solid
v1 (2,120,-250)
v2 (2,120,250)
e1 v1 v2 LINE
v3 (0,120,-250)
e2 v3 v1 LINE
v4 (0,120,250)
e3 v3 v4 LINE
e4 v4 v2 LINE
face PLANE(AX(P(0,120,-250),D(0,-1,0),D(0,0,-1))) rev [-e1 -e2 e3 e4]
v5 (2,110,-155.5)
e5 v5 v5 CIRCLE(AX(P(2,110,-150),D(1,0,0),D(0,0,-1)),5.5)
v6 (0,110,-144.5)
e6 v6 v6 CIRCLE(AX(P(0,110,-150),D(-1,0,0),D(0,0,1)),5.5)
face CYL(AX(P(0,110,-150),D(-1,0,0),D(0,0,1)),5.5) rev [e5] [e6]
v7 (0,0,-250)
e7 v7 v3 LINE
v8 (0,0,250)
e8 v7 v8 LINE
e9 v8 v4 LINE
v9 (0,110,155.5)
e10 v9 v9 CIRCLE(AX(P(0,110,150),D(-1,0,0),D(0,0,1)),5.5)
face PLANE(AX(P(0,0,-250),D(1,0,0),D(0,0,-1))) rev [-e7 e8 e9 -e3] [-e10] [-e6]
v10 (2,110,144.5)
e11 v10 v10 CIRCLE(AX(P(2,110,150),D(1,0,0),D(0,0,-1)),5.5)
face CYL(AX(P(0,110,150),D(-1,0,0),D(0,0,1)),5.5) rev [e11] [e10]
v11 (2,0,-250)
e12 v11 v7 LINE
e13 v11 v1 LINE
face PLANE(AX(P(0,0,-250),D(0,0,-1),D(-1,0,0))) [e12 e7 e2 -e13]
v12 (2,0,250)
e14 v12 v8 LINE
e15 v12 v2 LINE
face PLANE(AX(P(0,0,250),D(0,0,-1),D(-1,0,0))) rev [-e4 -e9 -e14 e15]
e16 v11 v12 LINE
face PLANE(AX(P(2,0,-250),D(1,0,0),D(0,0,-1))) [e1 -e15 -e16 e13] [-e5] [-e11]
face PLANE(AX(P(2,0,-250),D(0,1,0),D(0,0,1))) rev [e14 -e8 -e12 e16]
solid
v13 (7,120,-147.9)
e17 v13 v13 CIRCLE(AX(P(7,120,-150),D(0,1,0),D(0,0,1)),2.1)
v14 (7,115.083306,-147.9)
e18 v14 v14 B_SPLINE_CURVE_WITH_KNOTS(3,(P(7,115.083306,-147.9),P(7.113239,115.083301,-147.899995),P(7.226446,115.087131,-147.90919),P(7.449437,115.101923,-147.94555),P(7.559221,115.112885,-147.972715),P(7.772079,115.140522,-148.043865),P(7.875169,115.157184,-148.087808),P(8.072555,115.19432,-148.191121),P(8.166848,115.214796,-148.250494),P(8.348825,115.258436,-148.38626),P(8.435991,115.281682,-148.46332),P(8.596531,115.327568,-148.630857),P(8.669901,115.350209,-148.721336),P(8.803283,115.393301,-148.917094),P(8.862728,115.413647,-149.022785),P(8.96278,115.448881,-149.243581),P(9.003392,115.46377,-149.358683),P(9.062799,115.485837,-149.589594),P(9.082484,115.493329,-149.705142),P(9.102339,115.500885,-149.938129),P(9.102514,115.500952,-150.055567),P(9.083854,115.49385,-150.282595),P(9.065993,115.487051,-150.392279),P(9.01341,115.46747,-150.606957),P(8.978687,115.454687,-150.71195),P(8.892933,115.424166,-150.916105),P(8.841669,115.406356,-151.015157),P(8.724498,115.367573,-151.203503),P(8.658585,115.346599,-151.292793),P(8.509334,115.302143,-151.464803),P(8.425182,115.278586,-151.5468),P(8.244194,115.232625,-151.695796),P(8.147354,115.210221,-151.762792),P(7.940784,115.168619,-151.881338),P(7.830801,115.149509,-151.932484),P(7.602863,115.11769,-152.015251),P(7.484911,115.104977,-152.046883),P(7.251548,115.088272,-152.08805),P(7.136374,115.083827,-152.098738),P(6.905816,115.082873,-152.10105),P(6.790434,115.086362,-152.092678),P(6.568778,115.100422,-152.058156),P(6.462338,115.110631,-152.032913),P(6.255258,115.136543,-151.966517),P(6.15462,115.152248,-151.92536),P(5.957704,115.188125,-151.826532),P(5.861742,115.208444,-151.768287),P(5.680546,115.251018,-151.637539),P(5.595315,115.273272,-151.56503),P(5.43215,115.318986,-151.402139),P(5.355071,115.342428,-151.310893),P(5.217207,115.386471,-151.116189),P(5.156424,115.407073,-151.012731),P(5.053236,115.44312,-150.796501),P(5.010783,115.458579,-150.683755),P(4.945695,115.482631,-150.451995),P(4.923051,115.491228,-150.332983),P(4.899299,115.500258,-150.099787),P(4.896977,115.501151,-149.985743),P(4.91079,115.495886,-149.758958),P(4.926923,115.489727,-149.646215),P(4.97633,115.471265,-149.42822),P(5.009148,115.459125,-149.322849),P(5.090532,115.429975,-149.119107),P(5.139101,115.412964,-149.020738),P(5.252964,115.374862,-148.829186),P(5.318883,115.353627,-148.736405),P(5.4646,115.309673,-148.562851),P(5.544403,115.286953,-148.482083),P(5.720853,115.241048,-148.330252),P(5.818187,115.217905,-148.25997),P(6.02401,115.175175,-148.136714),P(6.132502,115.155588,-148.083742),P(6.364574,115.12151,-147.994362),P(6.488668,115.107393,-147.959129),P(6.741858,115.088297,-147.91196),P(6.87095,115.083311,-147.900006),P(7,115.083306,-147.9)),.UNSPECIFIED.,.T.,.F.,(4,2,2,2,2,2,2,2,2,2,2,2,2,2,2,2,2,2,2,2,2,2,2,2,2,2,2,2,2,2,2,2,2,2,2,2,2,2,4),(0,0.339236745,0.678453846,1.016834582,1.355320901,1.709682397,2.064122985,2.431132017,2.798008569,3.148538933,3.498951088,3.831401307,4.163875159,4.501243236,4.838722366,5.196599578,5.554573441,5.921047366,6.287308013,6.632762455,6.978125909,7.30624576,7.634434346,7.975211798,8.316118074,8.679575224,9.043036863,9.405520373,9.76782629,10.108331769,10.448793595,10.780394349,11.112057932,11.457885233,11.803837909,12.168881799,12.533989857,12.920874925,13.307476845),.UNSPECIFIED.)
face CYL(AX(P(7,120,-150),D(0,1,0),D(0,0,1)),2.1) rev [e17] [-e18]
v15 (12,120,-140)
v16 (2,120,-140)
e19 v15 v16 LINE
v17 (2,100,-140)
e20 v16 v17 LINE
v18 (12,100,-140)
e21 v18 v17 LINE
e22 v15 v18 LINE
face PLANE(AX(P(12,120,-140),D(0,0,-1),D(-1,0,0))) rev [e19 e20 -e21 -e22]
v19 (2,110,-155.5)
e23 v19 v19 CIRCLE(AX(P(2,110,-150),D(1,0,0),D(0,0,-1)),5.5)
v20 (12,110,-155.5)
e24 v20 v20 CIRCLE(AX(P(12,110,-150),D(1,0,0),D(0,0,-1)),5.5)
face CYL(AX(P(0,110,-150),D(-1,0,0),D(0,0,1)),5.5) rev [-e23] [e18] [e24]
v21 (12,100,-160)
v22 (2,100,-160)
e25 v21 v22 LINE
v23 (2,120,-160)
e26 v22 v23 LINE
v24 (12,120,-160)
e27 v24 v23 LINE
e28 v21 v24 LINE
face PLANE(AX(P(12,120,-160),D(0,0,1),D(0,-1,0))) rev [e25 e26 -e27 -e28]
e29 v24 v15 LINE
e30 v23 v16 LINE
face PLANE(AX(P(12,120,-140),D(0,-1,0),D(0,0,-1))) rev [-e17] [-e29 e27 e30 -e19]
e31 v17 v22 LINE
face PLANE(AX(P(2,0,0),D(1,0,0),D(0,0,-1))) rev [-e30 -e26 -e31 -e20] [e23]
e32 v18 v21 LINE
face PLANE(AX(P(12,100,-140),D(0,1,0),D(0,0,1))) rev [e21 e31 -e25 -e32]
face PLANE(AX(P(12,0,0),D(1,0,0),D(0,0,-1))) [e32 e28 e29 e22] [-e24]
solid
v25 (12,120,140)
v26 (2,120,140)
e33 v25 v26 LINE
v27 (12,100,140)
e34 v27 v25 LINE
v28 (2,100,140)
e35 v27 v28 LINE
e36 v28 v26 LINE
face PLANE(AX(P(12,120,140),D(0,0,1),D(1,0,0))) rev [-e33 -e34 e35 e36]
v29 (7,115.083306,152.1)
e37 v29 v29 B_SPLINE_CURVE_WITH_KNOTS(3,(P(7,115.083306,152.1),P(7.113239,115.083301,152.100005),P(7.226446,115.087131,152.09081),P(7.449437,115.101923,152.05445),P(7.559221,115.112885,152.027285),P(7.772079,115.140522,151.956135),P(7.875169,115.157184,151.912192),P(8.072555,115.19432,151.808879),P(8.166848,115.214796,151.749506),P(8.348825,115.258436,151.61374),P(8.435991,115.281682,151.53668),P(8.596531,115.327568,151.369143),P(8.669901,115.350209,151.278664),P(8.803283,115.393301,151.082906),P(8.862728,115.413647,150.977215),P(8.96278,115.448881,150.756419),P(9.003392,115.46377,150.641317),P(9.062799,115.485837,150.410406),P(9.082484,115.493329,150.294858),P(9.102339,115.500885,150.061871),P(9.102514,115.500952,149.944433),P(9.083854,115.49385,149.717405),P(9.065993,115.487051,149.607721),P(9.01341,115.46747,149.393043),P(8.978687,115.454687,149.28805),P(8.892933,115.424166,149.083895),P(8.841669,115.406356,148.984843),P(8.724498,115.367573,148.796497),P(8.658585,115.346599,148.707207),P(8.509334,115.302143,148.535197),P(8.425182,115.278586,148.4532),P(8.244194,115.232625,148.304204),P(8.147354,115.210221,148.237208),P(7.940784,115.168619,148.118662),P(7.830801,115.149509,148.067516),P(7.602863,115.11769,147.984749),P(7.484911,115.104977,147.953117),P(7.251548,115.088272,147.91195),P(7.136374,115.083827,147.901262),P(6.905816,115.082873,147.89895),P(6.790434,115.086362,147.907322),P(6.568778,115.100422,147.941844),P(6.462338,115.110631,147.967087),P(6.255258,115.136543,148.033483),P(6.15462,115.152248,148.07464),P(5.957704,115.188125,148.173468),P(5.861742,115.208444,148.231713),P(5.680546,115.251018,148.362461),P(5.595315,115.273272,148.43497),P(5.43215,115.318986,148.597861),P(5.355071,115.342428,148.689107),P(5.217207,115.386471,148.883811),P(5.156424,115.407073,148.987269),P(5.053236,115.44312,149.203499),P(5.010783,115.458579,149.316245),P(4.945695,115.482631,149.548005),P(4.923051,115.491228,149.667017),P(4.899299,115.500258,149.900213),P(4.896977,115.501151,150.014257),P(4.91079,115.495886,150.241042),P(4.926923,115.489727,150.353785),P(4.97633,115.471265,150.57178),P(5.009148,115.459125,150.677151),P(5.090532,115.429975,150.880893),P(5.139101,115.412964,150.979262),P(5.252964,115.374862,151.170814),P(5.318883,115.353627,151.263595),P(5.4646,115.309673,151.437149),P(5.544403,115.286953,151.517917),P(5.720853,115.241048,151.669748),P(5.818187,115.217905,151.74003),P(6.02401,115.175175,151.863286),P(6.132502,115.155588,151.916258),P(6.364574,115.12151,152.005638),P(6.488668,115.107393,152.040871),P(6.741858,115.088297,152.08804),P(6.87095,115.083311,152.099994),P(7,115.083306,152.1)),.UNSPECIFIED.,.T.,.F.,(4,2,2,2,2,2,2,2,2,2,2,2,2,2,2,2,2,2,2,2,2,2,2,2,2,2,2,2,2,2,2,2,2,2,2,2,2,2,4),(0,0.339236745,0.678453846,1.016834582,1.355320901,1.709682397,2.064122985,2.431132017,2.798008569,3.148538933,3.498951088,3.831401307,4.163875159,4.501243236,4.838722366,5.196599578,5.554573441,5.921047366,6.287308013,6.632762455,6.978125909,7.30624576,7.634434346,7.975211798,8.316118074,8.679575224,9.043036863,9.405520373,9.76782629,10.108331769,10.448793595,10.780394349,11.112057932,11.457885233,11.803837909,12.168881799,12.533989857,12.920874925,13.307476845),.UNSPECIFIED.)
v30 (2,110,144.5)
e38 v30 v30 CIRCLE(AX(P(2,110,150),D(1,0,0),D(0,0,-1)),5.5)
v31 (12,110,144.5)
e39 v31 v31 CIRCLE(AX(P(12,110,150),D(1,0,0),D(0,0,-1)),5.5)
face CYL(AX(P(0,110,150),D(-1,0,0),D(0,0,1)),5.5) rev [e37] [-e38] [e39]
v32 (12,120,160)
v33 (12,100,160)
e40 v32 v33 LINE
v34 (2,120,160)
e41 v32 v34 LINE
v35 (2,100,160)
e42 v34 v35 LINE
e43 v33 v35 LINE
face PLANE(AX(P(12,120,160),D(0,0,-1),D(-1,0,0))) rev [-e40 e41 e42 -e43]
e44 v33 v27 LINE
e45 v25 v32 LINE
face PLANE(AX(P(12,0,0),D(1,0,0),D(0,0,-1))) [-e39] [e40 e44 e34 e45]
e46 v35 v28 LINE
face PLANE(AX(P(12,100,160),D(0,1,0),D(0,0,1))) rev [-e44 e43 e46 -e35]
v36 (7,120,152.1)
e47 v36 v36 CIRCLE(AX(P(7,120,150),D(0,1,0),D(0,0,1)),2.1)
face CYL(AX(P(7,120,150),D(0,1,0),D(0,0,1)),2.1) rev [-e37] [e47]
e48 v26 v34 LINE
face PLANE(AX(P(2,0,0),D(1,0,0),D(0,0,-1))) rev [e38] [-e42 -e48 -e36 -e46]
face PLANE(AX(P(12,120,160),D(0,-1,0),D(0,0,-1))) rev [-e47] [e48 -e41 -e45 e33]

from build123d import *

# Parameters (mm, degrees)
SKIZZE1_W                                 = 2
SKIZZE1_H                                 = 120
BASIS_BLECH1_DEPTH                        = 250
SKIZZE6_W                                 = 20
SKIZZE6_H                                 = 20
AUFSATZ_LINEAR_AUSTRAGEN1_DEPTH           = 10
AUFSATZ_LINEAR_AUSTRAGEN1_2_DEPTH         = 10
F_11_0_11_DURCHMESSER_BOHRUNG1_AT_2_COUNT = 2
F_11_0_11_DURCHMESSER_BOHRUNG1_AT_2_PITCH = 300
M5_GEWINDEBOHRUNG1_AT_2_COUNT             = 2
M5_GEWINDEBOHRUNG1_AT_2_PITCH             = 300


# Sheet-metal steps are written as plain solids
with BuildPart() as part:
    # Skizze1 → Basis-Blech1 (new, symmetric)
    with BuildSketch(Plane.XY):
        with Locations((1, 60)):
            Rectangle(SKIZZE1_W, SKIZZE1_H)
    extrude(amount=BASIS_BLECH1_DEPTH, both=True)


with BuildPart() as body_2:
    # Skizze6 → Aufsatz-Linear austragen1 (new body)
    with BuildSketch(Plane(origin=(2, 0, 0), x_dir=(0, 0, -1), z_dir=(1, 0, 0))):
        with Locations((-150, 110)):
            Rectangle(SKIZZE6_W, SKIZZE6_H)
    extrude(amount=AUFSATZ_LINEAR_AUSTRAGEN1_DEPTH)


with BuildPart() as body_3:
    # Skizze6 → Aufsatz-Linear austragen1 2 (new body)
    with BuildSketch(Plane(origin=(2, 0, 0), x_dir=(0, 0, -1), z_dir=(1, 0, 0))):
        with Locations((150, 110)):
            Rectangle(SKIZZE6_W, SKIZZE6_H)
    extrude(amount=AUFSATZ_LINEAR_AUSTRAGEN1_2_DEPTH)


with BuildPart() as f_11_0_11_durchmesser_bohrung1_tool:
    # Skizze4 → Ø11.0 (11) Durchmesser Bohrung1 (revolve)
    with BuildSketch(Plane(origin=(0, 110, 150), x_dir=(0, 0, 1), z_dir=(0, 1, 0))):
        Polygon((0, 0), (0, 23.304733405), (5.5, 20), (5.5, 0), align=None)
    f_11_0_11_durchmesser_bohrung1 = revolve(axis=Axis((-6.35, 110, 150), (1, 0, 0)))


with BuildPart() as part_1:
    add(part.part)

    # Ø11.0 (11) Durchmesser Bohrung1: cut by f_11_0_11_durchmesser_bohrung1_tool
    add(f_11_0_11_durchmesser_bohrung1_tool.part, mode=Mode.SUBTRACT)


with BuildPart() as body_2_1:
    add(body_2.part)

    # Ø11.0 (11) Durchmesser Bohrung1: cut by f_11_0_11_durchmesser_bohrung1_tool
    add(f_11_0_11_durchmesser_bohrung1_tool.part, mode=Mode.SUBTRACT)

    # Skizze7 → M5 Gewindebohrung1 (revolve, cut)
    with BuildSketch(Plane(origin=(7, 120, 150), x_dir=(0, 0, 1), z_dir=(1, 0, 0))):
        Polygon((0, 0), (0, 15.2618073), (2.1, 14), (2.1, 0), align=None)
    m5_gewindebohrung1 = revolve(axis=Axis((7, 126.35, 150), (0, -1, 0)), mode=Mode.SUBTRACT)


with BuildPart() as f_11_0_11_durchmesser_bohrung1_at_2_tool:
    # Ø11.0 (11) Durchmesser Bohrung1 at 2: Ø11.0 (11) Durchmesser Bohrung1 ×2
    with Locations(*[(0, 0, -i * F_11_0_11_DURCHMESSER_BOHRUNG1_AT_2_PITCH) for i in range(1, F_11_0_11_DURCHMESSER_BOHRUNG1_AT_2_COUNT)]):
        add(f_11_0_11_durchmesser_bohrung1)


with BuildPart() as part_2:
    add(part_1.part)

    # Ø11.0 (11) Durchmesser Bohrung1 at 2: cut by f_11_0_11_durchmesser_bohrung1_at_2_tool
    add(f_11_0_11_durchmesser_bohrung1_at_2_tool.part, mode=Mode.SUBTRACT)


with BuildPart() as body_3_1:
    add(body_3.part)

    # Ø11.0 (11) Durchmesser Bohrung1 at 2: cut by f_11_0_11_durchmesser_bohrung1_at_2_tool
    add(f_11_0_11_durchmesser_bohrung1_at_2_tool.part, mode=Mode.SUBTRACT)

    # M5 Gewindebohrung1 at 2: M5 Gewindebohrung1 ×2
    with Locations(*[(0, 0, -i * M5_GEWINDEBOHRUNG1_AT_2_PITCH) for i in range(1, M5_GEWINDEBOHRUNG1_AT_2_COUNT)]):
        add(m5_gewindebohrung1, mode=Mode.SUBTRACT)


solid = Compound([body_2_1.part, part_2.part, body_3_1.part])
